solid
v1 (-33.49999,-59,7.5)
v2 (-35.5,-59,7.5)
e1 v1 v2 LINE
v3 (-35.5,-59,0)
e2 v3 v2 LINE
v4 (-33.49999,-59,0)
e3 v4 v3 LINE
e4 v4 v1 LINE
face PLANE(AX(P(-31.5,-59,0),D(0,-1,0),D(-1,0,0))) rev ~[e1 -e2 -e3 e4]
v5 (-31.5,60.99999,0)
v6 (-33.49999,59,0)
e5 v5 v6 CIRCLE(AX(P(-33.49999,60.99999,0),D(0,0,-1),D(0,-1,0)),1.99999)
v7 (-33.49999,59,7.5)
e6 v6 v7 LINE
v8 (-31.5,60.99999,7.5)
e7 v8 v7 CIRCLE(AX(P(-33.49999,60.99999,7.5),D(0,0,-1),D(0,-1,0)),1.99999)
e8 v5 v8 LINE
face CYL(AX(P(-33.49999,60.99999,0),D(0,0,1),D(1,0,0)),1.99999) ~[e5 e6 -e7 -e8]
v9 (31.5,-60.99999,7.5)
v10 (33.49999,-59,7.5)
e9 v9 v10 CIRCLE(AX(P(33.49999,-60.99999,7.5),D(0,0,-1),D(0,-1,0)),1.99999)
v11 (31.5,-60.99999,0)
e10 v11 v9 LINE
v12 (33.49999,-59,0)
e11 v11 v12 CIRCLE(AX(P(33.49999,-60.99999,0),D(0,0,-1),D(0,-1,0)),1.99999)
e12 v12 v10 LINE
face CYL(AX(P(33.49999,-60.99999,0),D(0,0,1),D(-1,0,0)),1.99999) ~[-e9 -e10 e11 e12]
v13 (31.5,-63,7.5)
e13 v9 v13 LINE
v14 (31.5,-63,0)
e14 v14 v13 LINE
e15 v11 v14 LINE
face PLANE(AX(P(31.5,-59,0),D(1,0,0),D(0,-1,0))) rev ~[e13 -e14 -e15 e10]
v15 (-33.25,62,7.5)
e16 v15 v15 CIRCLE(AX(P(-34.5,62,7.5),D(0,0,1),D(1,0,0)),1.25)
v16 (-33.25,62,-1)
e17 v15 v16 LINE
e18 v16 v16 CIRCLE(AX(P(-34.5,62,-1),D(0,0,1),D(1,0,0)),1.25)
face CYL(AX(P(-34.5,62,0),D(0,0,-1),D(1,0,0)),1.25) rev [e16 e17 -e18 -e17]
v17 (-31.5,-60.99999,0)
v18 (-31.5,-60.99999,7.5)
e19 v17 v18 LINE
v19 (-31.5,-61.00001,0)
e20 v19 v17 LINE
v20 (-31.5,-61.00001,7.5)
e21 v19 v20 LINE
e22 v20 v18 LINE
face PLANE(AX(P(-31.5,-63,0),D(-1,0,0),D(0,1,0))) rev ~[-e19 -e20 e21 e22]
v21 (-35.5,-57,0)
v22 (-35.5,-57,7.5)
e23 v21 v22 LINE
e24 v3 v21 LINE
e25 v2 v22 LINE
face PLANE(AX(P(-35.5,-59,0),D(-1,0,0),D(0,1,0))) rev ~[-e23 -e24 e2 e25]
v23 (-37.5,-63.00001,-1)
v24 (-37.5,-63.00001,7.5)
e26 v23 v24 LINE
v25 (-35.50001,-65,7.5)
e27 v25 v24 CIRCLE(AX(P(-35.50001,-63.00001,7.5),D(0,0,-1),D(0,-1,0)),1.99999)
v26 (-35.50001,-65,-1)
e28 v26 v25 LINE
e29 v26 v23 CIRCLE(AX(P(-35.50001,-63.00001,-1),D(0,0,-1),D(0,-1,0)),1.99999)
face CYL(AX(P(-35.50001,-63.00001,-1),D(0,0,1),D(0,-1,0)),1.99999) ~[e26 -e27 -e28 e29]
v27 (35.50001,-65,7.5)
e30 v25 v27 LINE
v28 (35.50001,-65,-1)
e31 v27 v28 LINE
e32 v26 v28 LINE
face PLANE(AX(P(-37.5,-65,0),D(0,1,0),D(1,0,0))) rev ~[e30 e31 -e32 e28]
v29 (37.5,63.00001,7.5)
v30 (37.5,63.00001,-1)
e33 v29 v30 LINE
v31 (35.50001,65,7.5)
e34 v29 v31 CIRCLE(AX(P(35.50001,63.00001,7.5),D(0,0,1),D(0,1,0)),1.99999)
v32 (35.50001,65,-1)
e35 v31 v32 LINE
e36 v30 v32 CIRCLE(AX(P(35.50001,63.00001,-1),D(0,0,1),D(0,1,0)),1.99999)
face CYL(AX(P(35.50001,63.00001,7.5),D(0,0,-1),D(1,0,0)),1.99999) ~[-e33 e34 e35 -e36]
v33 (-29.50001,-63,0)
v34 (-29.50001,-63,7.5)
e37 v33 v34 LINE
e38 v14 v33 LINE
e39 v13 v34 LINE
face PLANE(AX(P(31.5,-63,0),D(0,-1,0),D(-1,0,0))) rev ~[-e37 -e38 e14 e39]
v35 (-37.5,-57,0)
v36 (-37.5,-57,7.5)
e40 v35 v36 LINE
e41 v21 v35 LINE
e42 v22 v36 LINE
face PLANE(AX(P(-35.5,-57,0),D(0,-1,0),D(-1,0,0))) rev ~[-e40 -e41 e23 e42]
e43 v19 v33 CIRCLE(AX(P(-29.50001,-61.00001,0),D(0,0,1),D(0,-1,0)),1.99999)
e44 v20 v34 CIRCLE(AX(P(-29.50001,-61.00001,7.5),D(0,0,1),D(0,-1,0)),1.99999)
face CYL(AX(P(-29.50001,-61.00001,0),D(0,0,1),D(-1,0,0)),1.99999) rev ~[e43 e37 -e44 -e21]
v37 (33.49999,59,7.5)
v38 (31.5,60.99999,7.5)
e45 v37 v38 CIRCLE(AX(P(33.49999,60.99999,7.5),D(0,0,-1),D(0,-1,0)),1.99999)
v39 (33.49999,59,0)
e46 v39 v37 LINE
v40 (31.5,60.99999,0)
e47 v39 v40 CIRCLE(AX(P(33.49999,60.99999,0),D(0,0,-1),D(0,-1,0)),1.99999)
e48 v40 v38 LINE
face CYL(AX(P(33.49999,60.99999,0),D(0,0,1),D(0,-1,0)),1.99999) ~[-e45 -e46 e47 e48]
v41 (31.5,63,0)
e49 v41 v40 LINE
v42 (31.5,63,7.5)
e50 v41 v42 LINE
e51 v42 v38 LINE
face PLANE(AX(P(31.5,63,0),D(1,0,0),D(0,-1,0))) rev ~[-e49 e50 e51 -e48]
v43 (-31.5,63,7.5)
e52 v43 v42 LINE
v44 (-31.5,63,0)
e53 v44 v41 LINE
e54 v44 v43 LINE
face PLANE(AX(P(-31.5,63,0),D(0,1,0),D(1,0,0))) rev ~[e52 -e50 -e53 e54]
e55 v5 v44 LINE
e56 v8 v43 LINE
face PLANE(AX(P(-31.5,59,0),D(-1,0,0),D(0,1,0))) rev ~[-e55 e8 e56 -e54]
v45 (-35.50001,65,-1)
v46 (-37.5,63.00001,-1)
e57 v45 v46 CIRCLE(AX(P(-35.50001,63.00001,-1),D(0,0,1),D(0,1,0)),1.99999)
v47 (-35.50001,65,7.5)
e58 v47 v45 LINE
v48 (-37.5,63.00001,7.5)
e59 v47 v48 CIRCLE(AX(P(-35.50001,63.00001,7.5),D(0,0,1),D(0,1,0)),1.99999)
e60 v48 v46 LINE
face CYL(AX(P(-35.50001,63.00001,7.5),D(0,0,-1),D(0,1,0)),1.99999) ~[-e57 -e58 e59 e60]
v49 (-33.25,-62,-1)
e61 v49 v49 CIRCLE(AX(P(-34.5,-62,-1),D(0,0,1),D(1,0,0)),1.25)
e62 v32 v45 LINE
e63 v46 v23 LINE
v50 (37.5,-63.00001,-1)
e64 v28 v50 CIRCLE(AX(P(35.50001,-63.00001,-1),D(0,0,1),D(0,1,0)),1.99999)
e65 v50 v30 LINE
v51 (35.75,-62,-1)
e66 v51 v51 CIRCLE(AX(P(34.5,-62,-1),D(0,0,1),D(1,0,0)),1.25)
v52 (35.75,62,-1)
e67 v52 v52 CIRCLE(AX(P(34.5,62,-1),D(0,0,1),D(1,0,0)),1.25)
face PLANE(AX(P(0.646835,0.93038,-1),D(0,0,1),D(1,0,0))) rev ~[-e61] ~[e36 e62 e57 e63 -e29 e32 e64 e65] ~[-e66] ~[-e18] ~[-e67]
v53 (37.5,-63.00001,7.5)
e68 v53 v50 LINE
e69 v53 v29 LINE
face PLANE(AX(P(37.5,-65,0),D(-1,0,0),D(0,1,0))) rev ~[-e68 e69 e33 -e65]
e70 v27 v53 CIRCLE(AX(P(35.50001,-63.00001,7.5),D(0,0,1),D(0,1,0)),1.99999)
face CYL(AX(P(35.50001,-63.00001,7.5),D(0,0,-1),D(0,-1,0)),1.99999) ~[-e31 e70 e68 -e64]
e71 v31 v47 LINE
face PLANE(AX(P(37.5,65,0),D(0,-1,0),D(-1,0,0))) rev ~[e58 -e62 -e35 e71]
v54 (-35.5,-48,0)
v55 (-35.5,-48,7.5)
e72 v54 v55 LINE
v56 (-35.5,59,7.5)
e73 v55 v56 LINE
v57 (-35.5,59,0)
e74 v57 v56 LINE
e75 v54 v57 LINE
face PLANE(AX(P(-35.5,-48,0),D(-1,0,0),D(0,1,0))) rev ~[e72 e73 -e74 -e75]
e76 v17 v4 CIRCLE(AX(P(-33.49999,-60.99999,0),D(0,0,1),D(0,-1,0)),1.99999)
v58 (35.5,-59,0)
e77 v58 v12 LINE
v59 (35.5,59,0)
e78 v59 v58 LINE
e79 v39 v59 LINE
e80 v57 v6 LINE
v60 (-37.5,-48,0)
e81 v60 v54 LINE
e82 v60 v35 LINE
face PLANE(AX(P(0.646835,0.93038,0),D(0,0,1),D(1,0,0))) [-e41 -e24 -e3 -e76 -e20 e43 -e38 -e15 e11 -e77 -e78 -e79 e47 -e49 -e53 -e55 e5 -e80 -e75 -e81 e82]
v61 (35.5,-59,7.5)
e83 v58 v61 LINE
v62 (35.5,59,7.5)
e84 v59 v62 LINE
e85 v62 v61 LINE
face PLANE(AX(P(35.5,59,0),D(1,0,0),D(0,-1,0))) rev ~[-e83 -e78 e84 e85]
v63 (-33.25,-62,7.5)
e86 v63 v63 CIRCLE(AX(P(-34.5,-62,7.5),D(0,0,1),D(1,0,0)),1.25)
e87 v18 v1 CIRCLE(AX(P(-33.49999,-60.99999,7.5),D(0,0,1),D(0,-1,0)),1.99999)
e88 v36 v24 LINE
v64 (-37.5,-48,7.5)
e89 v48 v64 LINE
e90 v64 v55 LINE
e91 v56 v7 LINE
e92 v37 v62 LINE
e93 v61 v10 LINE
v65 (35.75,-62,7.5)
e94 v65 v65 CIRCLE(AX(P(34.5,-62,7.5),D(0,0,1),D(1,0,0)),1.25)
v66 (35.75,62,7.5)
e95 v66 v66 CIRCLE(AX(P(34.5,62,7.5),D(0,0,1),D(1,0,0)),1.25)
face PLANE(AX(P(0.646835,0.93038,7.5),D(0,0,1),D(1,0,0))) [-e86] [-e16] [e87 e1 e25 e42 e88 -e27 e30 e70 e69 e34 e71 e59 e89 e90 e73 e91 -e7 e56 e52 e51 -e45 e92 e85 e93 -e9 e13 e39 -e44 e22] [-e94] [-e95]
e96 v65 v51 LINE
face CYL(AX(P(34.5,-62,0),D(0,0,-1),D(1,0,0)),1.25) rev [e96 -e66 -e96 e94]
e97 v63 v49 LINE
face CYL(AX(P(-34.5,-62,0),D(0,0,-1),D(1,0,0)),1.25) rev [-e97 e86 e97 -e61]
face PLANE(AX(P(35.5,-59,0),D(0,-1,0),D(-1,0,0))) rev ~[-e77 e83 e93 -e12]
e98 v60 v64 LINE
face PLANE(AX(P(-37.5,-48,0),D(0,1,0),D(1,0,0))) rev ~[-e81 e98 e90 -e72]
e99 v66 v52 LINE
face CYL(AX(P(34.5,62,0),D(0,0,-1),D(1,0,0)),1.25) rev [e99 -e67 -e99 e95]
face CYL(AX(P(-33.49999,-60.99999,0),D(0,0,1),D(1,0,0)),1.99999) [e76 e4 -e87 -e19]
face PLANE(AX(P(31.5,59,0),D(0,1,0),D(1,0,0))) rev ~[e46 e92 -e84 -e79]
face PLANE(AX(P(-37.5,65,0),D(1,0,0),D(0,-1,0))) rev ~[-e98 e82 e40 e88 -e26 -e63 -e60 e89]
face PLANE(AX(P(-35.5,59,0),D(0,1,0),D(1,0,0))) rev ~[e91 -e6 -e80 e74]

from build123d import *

# Parameters (mm, degrees)
F0_R     = 1.25
F0_W     = 2
F0_H     = 9
F1_DEPTH = 1
F2_DEPTH = 7.5
F3_R     = 1.99999


# Not quite as in the source:
# - a fillet or chamfer is up to 0.001 mm smaller than in the source, because OpenCascade refuses the exact size


with BuildPart() as f1:
    # F0 (on Top) → F1 (new body)
    with BuildSketch(Plane.XY):
        Polygon((-35.5, -48), (-35.5, 59), (-31.5, 59), (-31.5, 63), (31.5, 63), (31.5, 59), (35.5, 59), (35.5, -59), (31.5, -59), (31.5, -63), (-31.5, -63), (-31.5, -59), (-35.5, -59), (-35.5, -57), (-37.5, -57), (-37.5, -65), (37.5, -65), (37.5, 65), (-37.5, 65), (-37.5, -48), align=None)
        with Locations((-34.5, -62)):
            Circle(F0_R, mode=Mode.SUBTRACT)
        with Locations((34.5, -62)):
            Circle(F0_R, mode=Mode.SUBTRACT)
        with Locations((-34.5, 62)):
            Circle(F0_R, mode=Mode.SUBTRACT)
        with Locations((34.5, 62)):
            Circle(F0_R, mode=Mode.SUBTRACT)
        Polygon((-31.5, 59), (-35.5, 59), (-35.5, -48), (-35.5, -57), (-35.5, -59), (-31.5, -59), (-31.5, -63), (31.5, -63), (31.5, -59), (35.5, -59), (35.5, 59), (31.5, 59), (31.5, 63), (-31.5, 63), align=None)
        with Locations((-36.5, -52.5)):
            Rectangle(F0_W, F0_H)
    extrude(amount=-F1_DEPTH)

    # F0 (on Top) → F2 (join)
    with BuildSketch(Plane.XY):
        Polygon((-35.5, -48), (-35.5, 59), (-31.5, 59), (-31.5, 63), (31.5, 63), (31.5, 59), (35.5, 59), (35.5, -59), (31.5, -59), (31.5, -63), (-31.5, -63), (-31.5, -59), (-35.5, -59), (-35.5, -57), (-37.5, -57), (-37.5, -65), (37.5, -65), (37.5, 65), (-37.5, 65), (-37.5, -48), align=None)
        with Locations((-34.5, -62)):
            Circle(F0_R, mode=Mode.SUBTRACT)
        with Locations((34.5, -62)):
            Circle(F0_R, mode=Mode.SUBTRACT)
        with Locations((-34.5, 62)):
            Circle(F0_R, mode=Mode.SUBTRACT)
        with Locations((34.5, 62)):
            Circle(F0_R, mode=Mode.SUBTRACT)
    extrude(amount=F2_DEPTH)

    # F3 (radius 2 in the source; OpenCascade refuses exactly that, so slightly less here)
    f3_edges = [f1.edges().sort_by_distance(p)[0] for p in [
        (37.5, -65, 3.25),
        (37.5, 65, 3.25),
        (-37.5, 65, 3.25),
        (31.5, -59, 3.75),
        (-31.5, -63, 3.75),
        (-37.5, -65, 3.25),
        (-31.5, 59, 3.75),
        (31.5, 59, 3.75),
        (-31.5, -59, 3.75),
    ]]
    fillet(f3_edges, radius=F3_R)


solid = f1.part
